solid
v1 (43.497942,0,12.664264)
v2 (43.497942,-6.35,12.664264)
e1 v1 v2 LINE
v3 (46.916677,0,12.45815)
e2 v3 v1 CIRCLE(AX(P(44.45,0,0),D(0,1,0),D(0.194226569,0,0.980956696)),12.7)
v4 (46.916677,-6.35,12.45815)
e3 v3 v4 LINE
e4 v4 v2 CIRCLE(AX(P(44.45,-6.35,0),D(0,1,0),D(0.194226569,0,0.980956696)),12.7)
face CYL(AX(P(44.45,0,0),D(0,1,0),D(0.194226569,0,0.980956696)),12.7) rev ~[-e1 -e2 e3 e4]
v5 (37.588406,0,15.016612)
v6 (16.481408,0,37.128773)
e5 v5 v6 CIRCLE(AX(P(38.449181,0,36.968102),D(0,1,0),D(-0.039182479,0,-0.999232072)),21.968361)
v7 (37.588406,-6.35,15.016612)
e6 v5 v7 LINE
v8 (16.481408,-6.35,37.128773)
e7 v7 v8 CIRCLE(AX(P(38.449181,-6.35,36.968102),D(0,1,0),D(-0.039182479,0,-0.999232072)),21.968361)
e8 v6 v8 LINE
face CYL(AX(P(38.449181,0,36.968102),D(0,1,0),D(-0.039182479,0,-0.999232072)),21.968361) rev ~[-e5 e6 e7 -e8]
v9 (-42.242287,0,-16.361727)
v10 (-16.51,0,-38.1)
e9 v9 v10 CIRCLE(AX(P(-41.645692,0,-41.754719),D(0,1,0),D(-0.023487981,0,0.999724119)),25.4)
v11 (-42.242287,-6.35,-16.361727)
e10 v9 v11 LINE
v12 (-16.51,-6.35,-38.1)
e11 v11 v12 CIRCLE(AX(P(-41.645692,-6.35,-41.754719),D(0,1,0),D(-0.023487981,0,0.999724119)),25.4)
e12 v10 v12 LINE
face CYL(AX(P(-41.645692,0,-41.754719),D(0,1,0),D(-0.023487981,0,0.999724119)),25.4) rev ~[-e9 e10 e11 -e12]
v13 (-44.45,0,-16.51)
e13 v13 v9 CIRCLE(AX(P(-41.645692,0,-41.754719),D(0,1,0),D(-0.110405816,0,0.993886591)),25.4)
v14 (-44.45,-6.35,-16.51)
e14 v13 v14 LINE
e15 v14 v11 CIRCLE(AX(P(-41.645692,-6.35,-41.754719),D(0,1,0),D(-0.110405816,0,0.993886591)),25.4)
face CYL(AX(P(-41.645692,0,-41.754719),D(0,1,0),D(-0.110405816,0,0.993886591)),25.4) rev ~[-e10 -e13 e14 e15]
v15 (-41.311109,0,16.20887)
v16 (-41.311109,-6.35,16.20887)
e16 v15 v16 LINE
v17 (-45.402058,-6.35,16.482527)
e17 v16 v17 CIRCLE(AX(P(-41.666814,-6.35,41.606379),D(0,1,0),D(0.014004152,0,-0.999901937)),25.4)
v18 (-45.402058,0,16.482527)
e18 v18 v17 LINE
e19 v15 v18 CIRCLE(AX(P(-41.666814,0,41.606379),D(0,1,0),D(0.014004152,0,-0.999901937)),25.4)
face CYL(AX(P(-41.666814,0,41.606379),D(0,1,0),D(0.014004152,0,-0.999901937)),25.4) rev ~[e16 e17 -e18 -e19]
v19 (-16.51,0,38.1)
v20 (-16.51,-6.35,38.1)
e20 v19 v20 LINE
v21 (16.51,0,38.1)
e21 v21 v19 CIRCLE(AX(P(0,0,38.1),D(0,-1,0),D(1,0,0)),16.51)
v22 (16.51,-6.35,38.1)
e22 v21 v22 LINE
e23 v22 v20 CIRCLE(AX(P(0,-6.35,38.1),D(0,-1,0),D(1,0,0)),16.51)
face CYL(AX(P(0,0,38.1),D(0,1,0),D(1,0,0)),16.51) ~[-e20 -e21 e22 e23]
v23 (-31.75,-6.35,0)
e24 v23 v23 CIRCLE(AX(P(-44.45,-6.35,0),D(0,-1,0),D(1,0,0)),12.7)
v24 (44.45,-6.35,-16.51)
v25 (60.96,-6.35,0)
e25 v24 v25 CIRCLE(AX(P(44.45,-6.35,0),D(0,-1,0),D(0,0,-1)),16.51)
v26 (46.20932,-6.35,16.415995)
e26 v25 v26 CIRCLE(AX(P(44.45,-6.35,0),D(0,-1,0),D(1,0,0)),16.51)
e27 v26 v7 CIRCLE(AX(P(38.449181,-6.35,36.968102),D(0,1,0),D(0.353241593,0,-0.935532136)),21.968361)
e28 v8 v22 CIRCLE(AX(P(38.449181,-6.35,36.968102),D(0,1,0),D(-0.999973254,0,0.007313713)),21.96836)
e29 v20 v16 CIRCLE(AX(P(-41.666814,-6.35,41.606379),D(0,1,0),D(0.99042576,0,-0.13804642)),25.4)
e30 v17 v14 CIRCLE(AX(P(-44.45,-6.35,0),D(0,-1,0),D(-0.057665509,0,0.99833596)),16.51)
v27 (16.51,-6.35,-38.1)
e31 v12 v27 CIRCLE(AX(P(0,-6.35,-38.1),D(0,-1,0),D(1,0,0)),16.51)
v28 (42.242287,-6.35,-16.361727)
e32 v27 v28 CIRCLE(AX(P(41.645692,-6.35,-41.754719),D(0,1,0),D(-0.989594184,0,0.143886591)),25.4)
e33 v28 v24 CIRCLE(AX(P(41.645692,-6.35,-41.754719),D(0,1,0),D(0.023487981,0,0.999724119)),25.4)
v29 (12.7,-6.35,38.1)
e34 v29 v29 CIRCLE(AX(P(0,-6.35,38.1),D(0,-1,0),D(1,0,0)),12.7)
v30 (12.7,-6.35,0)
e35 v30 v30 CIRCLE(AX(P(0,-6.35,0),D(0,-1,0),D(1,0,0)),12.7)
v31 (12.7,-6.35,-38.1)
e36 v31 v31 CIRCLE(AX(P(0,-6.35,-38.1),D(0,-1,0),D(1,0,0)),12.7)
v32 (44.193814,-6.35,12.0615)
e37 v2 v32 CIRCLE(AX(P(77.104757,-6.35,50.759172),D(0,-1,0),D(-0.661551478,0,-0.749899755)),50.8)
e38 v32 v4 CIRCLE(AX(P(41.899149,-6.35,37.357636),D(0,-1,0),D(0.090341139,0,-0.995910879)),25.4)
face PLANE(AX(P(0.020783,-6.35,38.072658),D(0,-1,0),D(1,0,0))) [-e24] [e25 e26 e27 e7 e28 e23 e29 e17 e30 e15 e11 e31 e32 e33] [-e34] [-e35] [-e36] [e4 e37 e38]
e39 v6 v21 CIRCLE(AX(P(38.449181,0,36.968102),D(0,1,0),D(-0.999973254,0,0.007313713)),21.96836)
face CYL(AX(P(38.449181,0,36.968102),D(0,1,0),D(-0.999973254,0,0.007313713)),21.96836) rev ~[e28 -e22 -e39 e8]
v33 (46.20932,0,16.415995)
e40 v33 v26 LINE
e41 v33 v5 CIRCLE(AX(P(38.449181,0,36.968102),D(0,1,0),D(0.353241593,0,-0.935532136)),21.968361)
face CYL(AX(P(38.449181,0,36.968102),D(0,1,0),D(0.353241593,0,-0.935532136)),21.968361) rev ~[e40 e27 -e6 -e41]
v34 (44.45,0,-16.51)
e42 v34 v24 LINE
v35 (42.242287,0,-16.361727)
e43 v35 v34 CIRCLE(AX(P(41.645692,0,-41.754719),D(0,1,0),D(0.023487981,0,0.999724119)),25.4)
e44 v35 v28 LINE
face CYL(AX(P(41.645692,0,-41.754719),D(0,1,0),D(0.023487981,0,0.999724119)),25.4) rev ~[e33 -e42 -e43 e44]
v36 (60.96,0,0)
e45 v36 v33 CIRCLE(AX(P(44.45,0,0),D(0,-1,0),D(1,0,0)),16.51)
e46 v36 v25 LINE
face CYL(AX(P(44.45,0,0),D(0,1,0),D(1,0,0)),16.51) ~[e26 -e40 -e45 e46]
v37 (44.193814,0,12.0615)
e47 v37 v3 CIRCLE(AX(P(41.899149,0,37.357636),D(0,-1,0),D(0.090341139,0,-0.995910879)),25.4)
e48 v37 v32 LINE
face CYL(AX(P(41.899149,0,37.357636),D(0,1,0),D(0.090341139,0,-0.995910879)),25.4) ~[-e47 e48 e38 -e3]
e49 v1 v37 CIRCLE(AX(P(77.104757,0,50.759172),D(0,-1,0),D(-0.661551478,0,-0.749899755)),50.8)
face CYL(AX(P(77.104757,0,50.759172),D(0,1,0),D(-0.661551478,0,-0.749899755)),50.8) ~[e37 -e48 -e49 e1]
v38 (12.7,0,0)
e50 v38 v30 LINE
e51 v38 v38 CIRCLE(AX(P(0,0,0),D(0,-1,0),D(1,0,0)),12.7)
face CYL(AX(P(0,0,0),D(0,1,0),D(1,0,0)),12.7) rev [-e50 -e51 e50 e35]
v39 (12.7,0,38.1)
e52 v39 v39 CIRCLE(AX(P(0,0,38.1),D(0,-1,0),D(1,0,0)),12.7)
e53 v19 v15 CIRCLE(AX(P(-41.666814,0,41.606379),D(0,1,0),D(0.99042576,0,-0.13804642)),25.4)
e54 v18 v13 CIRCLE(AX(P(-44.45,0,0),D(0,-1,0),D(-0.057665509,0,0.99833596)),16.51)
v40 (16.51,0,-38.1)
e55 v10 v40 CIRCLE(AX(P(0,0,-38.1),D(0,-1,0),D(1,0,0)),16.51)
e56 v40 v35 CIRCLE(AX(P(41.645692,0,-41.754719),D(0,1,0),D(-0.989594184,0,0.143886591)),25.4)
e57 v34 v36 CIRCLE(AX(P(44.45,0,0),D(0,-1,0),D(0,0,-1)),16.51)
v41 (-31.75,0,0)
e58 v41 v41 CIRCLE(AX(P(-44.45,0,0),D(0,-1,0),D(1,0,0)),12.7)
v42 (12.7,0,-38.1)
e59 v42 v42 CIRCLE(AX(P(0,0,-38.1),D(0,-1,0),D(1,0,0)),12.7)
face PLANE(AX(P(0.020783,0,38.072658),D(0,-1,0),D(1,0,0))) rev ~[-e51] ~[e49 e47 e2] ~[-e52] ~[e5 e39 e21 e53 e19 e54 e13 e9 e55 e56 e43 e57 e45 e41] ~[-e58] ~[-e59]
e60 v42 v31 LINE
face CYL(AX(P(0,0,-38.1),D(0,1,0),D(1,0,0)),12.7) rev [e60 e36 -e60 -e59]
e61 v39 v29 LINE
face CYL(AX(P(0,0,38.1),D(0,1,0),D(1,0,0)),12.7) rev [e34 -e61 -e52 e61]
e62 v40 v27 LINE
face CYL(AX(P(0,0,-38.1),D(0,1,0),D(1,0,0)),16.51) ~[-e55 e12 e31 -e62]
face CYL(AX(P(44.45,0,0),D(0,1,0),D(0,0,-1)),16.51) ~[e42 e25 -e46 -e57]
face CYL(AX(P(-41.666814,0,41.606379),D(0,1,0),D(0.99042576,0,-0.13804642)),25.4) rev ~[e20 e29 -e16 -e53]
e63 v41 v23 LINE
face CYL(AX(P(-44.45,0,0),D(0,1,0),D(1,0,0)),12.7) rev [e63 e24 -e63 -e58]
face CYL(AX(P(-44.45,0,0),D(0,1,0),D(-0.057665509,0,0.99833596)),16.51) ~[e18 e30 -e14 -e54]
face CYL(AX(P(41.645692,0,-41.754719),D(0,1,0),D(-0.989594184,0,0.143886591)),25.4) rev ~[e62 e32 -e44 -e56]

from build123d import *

# Parameters (mm, degrees)
F0_R     = 12.7
F1_DEPTH = 6.35


# Not quite as in the source:
# - a feature names something its author has since deleted; it is built from what else it names


with BuildPart() as f1:
    # F0 (on Front) → F1 (new body)
    with BuildSketch(Plane.XZ):
        with BuildLine():
            ThreePointArc((16.4814082308, 37.1287725662), (16.4903338535, 37.6145443772), (16.51, 38.1))
            ThreePointArc((16.51, 38.1), (0, 54.61), (-16.51, 38.1))
            ThreePointArc((-16.51, 38.1), (-0.4858240981, 21.5971494903), (16.4814082308, 37.1287725662))
        make_face()
        with Locations((0, 38.1)):
            Circle(F0_R, mode=Mode.SUBTRACT)
        with BuildLine():
            ThreePointArc((16.4814082308, 37.1287725662), (-0.4858240981, 21.5971494903), (-16.51, 38.1))
            ThreePointArc((-16.51, 38.1), (-24.8582581267, 22.5634685942), (-41.3111088486, 16.2088698662))
            ThreePointArc((-41.3111088486, 16.2088698662), (-31.7141609442, 10.5061174344), (-27.94, 0))
            ThreePointArc((-27.94, 0), (-32.0196049569, -10.8657893902), (-42.2422869864, -16.3617267808))
            ThreePointArc((-42.2422869864, -16.3617267808), (-25.2542323654, -22.3516257894), (-16.51, -38.1))
            ThreePointArc((-16.51, -38.1), (0, -21.59), (16.51, -38.1))
            ThreePointArc((16.51, -38.1), (25.2542323654, -22.3516257894), (42.2422869864, -16.3617267808))
            ThreePointArc((42.2422869864, -16.3617267808), (28.118646251, -2.4221859395), (37.5884063644, 15.0166118942))
            ThreePointArc((37.5884063644, 15.0166118942), (22.5582227264, 21.7995063444), (16.4814082308, 37.1287725662))
        make_face()
        Circle(F0_R, mode=Mode.SUBTRACT)
        with BuildLine():
            ThreePointArc((-27.94, 0), (-31.7141609442, 10.5061174344), (-41.3111088486, 16.2088698662))
            ThreePointArc((-41.3111088486, 16.2088698662), (-43.3621139683, 16.2630178255), (-45.4020575599, 16.4825266996))
            ThreePointArc((-45.4020575599, 16.4825266996), (-60.9531302457, -0.4762269364), (-44.45, -16.51))
            ThreePointArc((-44.45, -16.51), (-43.3477588373, -16.4118117369), (-42.2422869864, -16.3617267808))
            ThreePointArc((-42.2422869864, -16.3617267808), (-32.0196049569, -10.8657893902), (-27.94, 0))
        make_face()
        with Locations((-44.45, 0)):
            Circle(F0_R, mode=Mode.SUBTRACT)
        with BuildLine():
            ThreePointArc((46.209319854, 16.4159950552), (41.9691064238, 15.2835688562), (37.5884063644, 15.0166118942))
            ThreePointArc((37.5884063644, 15.0166118942), (28.118646251, -2.4221859395), (42.2422869864, -16.3617267808))
            ThreePointArc((42.2422869864, -16.3617267808), (43.3477588373, -16.4118117369), (44.45, -16.51))
            ThreePointArc((44.45, -16.51), (56.1243329574, -11.6743329574), (60.96, 0))
            ThreePointArc((60.96, 0), (56.7306040322, 11.0348024271), (46.209319854, 16.4159950552))
        make_face()
        with BuildLine():
            ThreePointArc((46.9166774243, 12.4581500426), (43.685710075, -12.6769815378), (43.4979424401, 12.6642641477))
            ThreePointArc((43.4979424401, 12.6642641477), (43.8445127875, 12.3613055932), (44.1938141149, 12.0614998657))
            ThreePointArc((44.1938141149, 12.0614998657), (45.5606208941, 12.2229266237), (46.9166774243, 12.4581500426))
        make_face(mode=Mode.SUBTRACT)
        with BuildLine():
            ThreePointArc((-16.51, -38.1), (0, -54.61), (16.51, -38.1))
            ThreePointArc((16.51, -38.1), (0, -21.59), (-16.51, -38.1))
        make_face()
        with Locations((0, -38.1)):
            Circle(F0_R, mode=Mode.SUBTRACT)
    extrude(amount=F1_DEPTH)


solid = f1.part
